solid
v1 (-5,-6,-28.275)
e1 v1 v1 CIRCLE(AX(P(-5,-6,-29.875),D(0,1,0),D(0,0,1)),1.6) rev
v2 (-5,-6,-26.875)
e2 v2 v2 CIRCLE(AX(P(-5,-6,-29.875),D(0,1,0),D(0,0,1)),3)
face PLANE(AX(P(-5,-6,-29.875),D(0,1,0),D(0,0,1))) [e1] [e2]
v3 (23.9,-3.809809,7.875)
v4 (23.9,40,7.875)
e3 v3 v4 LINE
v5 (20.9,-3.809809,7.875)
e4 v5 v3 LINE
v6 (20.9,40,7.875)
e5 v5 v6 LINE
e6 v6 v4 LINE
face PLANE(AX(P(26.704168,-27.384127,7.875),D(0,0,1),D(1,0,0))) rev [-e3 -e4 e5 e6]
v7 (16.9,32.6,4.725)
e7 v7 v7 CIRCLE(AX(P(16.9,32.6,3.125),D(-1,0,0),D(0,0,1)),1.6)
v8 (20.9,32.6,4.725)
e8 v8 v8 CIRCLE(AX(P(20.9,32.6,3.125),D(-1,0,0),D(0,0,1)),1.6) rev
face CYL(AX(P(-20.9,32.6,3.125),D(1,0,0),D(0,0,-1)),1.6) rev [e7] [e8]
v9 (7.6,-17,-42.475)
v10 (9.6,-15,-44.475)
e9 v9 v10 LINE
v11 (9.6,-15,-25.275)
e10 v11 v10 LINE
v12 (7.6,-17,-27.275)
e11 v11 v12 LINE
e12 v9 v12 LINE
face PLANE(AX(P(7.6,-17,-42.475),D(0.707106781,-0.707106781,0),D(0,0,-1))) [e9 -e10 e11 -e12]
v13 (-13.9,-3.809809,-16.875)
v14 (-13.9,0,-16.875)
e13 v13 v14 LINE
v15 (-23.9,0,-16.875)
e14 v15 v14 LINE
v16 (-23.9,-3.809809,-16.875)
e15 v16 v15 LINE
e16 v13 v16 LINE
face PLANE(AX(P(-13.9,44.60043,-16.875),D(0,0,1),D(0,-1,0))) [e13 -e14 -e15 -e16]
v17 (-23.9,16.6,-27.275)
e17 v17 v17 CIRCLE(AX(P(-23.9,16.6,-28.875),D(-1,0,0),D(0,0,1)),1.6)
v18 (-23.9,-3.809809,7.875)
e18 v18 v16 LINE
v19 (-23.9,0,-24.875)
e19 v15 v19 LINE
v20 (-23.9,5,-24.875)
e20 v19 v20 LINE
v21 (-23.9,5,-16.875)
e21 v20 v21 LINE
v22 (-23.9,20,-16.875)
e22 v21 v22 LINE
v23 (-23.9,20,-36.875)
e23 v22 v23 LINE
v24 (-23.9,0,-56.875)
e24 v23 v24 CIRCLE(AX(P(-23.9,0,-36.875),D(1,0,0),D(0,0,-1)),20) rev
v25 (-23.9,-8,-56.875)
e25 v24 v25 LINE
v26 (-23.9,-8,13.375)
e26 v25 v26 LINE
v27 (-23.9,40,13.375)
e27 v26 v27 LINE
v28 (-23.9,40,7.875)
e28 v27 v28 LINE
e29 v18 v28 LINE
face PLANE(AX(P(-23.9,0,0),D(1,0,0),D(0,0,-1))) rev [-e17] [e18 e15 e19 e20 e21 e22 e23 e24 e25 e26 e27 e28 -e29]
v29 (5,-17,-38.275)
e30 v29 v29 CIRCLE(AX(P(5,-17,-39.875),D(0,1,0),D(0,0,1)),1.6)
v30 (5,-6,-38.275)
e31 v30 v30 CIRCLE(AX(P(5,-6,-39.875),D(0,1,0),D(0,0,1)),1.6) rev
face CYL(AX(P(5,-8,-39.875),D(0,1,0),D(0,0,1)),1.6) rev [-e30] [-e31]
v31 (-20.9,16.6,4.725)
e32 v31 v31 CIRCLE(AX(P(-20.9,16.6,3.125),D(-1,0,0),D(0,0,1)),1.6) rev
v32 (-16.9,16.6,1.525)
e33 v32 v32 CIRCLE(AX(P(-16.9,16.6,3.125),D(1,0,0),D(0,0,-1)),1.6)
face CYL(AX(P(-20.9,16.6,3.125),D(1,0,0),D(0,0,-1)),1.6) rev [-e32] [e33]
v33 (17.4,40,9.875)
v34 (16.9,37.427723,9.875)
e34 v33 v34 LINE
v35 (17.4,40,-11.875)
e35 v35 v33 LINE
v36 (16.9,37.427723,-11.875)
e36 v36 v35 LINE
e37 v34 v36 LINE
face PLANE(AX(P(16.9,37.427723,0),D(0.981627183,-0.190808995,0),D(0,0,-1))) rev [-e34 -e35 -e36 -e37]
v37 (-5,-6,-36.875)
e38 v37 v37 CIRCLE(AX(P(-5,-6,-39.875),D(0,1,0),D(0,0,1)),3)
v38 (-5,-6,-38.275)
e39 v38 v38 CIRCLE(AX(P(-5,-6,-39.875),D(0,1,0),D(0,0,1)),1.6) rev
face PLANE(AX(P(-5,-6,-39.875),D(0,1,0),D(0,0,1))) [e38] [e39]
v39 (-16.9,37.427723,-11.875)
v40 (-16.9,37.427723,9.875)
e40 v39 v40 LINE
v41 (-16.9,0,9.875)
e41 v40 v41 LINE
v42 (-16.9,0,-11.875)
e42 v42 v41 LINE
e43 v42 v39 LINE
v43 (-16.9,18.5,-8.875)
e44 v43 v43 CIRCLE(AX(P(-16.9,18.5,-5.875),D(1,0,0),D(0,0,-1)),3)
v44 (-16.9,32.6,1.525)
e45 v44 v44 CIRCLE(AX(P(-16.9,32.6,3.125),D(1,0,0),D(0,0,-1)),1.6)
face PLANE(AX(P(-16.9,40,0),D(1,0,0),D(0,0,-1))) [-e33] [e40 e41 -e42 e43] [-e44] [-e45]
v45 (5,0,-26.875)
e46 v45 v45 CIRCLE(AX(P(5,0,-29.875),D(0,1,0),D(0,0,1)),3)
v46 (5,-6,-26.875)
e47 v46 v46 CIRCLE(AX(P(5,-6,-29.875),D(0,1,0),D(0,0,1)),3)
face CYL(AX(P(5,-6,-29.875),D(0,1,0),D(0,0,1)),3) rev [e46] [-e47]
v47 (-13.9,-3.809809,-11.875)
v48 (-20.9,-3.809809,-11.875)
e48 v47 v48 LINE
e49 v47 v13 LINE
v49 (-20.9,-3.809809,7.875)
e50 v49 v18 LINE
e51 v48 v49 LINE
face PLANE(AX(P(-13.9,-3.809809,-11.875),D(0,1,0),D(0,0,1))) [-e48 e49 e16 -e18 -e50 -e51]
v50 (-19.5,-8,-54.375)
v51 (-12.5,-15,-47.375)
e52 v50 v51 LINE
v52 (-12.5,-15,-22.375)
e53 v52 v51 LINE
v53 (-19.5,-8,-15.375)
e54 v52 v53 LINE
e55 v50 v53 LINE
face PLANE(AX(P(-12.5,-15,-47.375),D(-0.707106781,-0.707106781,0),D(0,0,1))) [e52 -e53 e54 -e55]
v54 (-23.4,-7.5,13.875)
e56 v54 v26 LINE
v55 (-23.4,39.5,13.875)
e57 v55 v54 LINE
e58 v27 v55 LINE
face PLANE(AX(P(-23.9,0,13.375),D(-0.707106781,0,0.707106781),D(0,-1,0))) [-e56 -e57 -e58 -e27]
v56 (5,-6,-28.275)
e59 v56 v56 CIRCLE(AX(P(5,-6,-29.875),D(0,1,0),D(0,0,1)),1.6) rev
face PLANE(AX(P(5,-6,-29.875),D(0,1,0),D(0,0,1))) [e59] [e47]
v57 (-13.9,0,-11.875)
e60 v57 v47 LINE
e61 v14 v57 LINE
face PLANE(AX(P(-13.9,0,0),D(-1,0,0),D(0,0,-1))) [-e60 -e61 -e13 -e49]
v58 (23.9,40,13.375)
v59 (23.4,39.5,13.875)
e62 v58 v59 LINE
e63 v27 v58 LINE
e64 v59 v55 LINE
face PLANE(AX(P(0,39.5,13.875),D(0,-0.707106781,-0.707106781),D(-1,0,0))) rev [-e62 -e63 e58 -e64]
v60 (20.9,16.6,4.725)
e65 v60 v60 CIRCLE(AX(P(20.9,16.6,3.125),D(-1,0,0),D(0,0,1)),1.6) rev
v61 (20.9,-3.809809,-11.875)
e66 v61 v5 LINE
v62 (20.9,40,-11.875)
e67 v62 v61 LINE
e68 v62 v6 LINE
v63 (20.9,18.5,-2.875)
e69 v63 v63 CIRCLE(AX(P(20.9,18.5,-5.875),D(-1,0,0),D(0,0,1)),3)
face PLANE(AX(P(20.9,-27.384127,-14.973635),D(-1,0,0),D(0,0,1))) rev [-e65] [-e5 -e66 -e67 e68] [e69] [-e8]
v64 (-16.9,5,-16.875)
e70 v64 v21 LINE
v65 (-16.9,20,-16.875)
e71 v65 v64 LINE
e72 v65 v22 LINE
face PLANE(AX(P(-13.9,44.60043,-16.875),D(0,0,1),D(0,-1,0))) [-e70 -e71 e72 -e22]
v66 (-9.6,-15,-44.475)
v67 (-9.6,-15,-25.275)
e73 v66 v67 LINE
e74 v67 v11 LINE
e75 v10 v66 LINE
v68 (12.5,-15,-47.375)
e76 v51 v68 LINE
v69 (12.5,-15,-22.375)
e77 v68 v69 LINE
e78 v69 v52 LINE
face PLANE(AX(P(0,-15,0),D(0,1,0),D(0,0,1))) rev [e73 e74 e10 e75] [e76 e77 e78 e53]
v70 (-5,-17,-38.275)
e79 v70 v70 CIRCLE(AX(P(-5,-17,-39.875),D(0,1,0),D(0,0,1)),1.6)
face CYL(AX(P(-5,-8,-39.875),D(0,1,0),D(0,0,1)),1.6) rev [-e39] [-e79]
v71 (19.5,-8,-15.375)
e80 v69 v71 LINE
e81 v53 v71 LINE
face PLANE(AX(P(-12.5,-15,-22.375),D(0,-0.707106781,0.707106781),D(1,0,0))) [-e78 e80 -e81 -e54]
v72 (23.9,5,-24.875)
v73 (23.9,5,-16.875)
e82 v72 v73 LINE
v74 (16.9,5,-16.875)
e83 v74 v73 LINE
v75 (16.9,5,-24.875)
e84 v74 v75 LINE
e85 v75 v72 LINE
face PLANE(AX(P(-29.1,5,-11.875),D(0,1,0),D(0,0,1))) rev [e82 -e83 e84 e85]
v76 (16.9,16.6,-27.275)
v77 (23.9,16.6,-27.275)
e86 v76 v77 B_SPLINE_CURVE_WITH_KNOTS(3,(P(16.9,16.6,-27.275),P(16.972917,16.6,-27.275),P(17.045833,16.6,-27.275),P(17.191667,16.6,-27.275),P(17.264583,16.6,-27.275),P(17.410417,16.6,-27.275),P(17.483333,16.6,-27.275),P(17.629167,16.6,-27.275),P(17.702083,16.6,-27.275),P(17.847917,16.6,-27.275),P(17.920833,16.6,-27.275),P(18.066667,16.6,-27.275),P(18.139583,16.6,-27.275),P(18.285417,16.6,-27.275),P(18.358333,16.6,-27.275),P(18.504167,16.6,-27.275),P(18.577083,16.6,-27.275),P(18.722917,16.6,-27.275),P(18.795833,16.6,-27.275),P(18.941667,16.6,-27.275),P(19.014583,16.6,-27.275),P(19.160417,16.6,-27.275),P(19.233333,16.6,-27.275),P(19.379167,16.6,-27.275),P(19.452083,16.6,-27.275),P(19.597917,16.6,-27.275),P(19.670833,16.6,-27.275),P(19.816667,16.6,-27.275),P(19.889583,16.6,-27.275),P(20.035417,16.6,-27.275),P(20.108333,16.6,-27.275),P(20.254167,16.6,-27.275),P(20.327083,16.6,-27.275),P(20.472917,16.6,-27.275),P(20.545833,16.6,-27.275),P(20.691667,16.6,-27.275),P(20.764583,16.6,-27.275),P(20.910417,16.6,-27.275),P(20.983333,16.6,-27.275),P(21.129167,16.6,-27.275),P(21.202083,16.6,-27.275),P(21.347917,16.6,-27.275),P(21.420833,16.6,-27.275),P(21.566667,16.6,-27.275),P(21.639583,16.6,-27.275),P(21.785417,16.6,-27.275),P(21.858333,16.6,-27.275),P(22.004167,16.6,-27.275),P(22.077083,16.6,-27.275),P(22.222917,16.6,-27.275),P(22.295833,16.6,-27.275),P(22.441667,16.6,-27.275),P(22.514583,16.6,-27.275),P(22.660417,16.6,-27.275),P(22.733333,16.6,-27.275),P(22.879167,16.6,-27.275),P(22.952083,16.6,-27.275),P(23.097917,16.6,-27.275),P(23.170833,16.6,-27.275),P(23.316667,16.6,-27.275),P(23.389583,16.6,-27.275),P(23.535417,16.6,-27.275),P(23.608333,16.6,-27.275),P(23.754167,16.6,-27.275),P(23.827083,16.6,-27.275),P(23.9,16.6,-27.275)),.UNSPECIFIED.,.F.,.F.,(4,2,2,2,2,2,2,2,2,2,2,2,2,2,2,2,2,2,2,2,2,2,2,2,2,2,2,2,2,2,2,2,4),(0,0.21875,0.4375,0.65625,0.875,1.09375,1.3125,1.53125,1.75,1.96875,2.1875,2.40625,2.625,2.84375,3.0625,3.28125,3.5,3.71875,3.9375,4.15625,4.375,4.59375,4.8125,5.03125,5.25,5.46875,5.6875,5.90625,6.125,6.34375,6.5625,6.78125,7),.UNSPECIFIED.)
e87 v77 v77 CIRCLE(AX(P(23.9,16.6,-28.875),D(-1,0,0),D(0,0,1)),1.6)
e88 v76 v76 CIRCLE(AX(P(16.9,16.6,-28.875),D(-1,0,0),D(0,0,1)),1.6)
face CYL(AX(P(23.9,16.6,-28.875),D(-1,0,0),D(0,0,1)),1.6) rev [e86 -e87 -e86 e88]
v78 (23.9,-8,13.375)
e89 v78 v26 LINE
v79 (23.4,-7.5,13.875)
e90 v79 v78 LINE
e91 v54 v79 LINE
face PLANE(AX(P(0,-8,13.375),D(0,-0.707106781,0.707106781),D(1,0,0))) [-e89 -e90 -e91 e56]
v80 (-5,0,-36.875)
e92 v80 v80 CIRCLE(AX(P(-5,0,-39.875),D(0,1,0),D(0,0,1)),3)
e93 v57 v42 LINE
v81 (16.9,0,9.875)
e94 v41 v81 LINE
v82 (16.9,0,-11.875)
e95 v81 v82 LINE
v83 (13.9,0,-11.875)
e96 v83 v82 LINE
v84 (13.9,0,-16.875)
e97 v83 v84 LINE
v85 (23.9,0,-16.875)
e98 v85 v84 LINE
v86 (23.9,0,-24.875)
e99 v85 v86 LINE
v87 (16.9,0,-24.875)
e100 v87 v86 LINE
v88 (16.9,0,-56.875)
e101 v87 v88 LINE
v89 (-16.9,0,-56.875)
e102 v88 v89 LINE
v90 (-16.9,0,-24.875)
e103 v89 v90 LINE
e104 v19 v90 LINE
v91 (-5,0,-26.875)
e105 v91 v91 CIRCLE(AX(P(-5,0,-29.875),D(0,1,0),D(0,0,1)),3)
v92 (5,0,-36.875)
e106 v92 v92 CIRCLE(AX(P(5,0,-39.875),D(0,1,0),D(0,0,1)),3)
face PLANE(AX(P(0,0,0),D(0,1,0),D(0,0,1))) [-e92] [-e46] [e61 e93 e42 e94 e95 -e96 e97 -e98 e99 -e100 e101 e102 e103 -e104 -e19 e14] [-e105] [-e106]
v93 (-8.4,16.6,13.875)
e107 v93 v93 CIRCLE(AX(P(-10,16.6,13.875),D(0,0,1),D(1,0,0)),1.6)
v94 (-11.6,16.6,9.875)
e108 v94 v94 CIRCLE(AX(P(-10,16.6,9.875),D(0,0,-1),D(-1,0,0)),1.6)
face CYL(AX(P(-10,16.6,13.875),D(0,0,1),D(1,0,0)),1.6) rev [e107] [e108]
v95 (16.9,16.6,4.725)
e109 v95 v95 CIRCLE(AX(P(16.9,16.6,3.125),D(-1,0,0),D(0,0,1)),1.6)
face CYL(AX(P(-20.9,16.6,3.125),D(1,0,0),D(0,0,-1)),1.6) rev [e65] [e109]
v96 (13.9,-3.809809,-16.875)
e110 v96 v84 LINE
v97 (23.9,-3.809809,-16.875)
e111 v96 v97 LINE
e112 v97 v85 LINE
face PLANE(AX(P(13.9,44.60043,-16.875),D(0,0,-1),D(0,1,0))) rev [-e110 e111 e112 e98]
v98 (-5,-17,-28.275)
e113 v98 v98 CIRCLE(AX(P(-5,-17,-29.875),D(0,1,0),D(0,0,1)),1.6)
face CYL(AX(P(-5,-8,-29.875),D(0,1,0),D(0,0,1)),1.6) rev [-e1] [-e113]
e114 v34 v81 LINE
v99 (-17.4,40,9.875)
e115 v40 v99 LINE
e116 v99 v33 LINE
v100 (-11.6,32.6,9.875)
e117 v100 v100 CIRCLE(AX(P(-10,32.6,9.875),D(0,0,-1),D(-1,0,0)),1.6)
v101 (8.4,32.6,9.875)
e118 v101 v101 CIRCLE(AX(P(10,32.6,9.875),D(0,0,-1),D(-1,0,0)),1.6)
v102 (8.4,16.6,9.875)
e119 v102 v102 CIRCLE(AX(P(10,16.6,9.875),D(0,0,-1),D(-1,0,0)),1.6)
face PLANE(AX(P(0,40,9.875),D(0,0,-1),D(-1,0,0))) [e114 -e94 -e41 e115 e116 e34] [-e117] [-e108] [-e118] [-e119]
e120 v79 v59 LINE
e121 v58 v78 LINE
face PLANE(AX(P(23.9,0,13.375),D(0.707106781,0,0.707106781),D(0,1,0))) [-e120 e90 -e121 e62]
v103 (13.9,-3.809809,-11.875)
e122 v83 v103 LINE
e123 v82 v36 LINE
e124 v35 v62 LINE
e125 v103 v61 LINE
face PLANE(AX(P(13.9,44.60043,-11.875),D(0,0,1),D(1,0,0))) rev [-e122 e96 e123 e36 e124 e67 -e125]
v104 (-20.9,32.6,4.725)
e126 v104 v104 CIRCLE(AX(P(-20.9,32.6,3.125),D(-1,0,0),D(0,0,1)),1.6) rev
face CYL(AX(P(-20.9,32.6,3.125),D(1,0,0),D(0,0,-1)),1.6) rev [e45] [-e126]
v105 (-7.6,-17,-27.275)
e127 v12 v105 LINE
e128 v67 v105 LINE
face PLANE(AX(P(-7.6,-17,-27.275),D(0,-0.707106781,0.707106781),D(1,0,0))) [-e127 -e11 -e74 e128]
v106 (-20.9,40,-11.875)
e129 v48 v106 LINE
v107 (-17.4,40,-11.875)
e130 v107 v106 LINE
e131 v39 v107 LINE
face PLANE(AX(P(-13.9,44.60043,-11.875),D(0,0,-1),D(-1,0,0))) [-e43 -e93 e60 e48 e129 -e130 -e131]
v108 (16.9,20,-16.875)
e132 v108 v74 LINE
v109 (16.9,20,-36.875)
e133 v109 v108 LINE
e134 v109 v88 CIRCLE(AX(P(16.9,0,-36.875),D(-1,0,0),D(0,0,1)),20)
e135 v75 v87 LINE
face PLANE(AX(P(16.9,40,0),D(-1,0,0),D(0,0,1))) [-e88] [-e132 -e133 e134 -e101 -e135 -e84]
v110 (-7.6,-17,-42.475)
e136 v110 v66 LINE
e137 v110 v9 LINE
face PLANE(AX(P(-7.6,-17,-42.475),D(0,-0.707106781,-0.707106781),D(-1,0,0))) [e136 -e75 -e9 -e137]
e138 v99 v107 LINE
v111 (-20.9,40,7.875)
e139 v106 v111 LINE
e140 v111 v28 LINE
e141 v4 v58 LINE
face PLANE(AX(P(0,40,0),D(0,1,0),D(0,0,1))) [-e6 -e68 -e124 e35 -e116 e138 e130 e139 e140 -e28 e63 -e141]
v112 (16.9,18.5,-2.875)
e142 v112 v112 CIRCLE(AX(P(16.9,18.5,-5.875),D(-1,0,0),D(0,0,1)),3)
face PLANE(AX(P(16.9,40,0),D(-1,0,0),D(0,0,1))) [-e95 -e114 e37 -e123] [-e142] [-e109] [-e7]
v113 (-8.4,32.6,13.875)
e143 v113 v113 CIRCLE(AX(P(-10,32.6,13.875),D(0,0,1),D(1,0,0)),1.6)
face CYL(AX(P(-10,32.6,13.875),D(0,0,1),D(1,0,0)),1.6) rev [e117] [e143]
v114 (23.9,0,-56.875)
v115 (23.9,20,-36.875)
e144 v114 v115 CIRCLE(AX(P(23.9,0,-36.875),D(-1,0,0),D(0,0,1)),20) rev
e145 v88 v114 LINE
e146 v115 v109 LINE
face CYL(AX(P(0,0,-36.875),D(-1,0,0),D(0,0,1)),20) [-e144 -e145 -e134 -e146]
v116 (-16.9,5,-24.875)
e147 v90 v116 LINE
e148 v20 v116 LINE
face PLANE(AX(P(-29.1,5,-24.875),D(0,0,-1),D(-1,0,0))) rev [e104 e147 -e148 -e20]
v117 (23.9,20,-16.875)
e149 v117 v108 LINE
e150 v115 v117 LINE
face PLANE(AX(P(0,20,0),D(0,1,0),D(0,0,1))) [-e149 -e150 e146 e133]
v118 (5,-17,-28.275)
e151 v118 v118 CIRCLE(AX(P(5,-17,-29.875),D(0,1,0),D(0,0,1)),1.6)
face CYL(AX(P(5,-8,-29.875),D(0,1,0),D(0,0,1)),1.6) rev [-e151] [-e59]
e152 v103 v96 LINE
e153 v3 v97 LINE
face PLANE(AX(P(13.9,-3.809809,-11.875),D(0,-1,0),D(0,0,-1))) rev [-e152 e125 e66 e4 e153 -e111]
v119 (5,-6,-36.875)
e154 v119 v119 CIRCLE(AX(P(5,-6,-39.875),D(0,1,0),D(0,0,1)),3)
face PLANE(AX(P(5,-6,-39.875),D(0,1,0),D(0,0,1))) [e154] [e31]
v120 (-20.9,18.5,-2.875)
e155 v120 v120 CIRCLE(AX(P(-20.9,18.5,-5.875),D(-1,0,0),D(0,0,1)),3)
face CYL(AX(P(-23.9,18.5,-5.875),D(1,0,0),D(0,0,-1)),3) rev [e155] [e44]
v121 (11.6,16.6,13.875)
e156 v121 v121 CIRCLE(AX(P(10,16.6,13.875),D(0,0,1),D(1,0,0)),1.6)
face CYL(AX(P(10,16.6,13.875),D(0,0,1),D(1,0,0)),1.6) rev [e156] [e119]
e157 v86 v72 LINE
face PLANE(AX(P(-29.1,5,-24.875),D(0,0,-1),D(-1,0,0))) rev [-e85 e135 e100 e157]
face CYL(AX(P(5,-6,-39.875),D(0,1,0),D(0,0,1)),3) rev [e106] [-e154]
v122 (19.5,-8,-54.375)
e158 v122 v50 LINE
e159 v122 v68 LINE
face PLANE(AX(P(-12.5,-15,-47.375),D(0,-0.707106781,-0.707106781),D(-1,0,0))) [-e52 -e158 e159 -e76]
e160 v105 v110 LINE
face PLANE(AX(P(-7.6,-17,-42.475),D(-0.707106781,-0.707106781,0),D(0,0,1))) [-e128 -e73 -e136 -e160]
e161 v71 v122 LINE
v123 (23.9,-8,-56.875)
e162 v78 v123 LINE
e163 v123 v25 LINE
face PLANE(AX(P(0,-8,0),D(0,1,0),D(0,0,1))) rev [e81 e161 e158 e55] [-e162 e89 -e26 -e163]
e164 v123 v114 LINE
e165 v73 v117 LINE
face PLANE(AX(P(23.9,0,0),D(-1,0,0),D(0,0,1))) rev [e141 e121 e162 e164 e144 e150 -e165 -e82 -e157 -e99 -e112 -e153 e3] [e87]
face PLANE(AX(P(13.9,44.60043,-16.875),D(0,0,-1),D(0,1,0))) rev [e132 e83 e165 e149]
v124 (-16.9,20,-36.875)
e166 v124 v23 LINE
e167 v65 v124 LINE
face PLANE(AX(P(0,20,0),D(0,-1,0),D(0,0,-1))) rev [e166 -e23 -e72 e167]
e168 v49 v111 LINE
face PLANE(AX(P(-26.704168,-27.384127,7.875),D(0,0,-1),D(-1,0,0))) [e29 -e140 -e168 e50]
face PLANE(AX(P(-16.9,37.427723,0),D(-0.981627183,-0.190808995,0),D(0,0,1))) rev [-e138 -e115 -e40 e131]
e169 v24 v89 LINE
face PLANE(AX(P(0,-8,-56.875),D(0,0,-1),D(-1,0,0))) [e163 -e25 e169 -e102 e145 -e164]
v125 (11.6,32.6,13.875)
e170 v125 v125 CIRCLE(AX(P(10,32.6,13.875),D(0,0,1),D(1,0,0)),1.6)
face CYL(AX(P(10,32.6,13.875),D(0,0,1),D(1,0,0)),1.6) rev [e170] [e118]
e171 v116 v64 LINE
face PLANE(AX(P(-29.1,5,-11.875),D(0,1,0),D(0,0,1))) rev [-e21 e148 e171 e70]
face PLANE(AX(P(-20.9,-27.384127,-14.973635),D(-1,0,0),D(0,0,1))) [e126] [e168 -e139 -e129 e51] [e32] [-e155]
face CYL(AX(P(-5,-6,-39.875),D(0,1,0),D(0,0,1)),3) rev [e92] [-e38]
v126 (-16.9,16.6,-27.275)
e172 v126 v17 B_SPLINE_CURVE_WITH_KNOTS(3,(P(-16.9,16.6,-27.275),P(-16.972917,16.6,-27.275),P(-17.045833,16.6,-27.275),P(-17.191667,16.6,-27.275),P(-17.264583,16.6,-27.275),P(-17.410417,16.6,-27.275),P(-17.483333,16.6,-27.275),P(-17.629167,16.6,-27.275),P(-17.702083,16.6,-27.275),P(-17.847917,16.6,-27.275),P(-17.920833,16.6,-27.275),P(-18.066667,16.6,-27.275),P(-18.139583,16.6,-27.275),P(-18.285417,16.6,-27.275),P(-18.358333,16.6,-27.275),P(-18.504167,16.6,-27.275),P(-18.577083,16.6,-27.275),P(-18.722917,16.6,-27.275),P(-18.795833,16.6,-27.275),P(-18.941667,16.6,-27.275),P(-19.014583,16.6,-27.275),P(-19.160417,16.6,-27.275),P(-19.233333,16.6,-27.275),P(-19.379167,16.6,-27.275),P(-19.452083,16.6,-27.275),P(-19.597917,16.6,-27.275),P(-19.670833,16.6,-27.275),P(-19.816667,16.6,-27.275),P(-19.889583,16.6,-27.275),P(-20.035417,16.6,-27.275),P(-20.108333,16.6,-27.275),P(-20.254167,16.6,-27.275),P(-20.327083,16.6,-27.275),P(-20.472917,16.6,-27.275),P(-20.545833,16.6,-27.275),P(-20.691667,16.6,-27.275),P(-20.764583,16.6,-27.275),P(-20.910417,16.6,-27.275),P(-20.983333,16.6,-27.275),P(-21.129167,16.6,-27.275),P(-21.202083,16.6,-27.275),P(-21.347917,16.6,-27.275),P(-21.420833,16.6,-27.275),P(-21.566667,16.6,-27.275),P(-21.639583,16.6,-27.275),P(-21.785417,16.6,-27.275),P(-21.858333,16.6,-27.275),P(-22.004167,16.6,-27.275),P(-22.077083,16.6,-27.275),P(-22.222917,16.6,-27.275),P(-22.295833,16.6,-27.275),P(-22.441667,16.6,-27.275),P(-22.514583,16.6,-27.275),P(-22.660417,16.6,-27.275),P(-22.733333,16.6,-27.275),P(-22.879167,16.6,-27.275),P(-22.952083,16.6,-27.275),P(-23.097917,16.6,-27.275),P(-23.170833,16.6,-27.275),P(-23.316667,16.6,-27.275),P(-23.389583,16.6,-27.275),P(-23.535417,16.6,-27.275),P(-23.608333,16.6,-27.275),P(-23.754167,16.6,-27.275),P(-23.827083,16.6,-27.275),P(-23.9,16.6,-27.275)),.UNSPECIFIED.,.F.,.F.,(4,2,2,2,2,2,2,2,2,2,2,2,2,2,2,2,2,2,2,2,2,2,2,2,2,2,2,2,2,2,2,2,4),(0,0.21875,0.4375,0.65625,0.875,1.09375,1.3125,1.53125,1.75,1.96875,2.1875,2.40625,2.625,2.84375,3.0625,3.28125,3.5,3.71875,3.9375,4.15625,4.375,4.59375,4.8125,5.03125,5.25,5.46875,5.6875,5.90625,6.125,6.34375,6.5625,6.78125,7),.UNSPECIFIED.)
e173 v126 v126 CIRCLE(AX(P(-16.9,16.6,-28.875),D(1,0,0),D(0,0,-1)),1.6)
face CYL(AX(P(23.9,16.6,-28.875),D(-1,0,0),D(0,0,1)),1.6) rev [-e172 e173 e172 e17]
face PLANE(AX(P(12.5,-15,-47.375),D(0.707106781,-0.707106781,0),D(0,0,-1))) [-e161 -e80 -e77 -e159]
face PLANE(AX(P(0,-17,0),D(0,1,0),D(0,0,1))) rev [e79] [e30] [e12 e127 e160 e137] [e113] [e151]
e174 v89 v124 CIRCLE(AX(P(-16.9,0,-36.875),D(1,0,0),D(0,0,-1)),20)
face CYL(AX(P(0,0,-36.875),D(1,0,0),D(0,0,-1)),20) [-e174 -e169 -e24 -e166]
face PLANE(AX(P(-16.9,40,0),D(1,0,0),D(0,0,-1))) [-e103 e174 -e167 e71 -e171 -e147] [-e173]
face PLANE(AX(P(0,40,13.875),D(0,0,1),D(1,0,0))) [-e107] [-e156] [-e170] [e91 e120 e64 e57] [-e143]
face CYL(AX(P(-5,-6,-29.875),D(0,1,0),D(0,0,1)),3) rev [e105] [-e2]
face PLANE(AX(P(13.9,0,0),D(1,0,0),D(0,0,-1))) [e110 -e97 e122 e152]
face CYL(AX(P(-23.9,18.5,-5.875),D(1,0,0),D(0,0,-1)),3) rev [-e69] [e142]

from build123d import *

# Parameters (mm, degrees)
EXTRUDE_1_DEPTH      = 40
SKETCH_1_3_W         = 33.8
SKETCH_1_3_H         = 23.75
SKETCH_1_3_R         = 1.6
EXTRUDE_2_DEPTH      = 8
SKETCH_4_R           = 1.6
CUT_EXTRUDE_1_DEPTH  = 82.129560735
SKETCH_8_W           = 4
SKETCH_8_H           = 43
EXTRUDE_3_DEPTH      = 20
EXTRUDE_START        = 3
SKETCH_11_R          = 1.6
EXTRUDE_5_DEPTH      = 3
SKETCH_12_R          = 1.6
EXTRUDE_6_DEPTH      = 3
FILLET_4_R           = 20
SKETCH_10_R          = 1.6
CUT_EXTRUDE_4_DEPTH  = 85.377755511
CHAMFER_1_SIZE       = 0.5
CHAMFER_1_SIZE2      = 2.572277008
HOLE_WIZARD_M3_1_D   = 3.2
SKETCH_14_W          = 5
SKETCH_14_H          = 48.410238409
CUT_EXTRUDE_6_DEPTH  = 10
CUT_EXTRUDE_11_REACH = 80.166
SKETCH_22_W          = 5.804167704
SKETCH_22_H          = 22.848634954
CHAMFER_2_SIZE       = 0.5
SKETCH_13_W          = 13
SKETCH_13_H          = 5
CUT_EXTRUDE_5_DEPTH  = 53
SKETCH_17_R          = 3
CUT_EXTRUDE_8_DEPTH  = 85.377755511
SKETCH_19_W          = 25
SKETCH_19_H          = 25
EXTRUDE_7_DEPTH      = 7
SKETCH_20_W          = 15.2
SKETCH_20_H          = 15.2
EXTRUDE_8_DEPTH      = 2
CHAMFER_3_SIZE       = 2
SKETCH_21_R          = 1.6
CUT_EXTRUDE_10_DEPTH = 74.52534002
SKETCH_18_R          = 3
CUT_EXTRUDE_9_DEPTH  = 6
CHAMFER_5_SIZE       = 7


with BuildPart() as part:
    # 草图1 → 凸台-拉伸1 (new body)
    with BuildSketch(Plane(origin=(0, 0, 0), x_dir=(1, 0, 0), z_dir=(0, 1, 0))):
        Polygon((-16.9, -9.875), (-16.9, 13.875), (-20.9, 13.875), (-20.9, -13.875), (20.9, -13.875), (20.9, 13.875), (16.9, 13.875), (16.9, -9.875), align=None)
    extrude(amount=EXTRUDE_1_DEPTH)

    # 草图1<3> → 凸台-拉伸2 (add)
    # profile 1 of 3: a face of its own
    with BuildSketch(Plane(origin=(0, 0, 0), x_dir=(1, 0, 0), z_dir=(0, 1, 0))):
        with Locations((0, 2)):
            Rectangle(SKETCH_1_3_W, SKETCH_1_3_H)
    # profile 2 of 3: a face of its own
    with BuildSketch(Plane(origin=(0, 0, 0), x_dir=(1, 0, 0), z_dir=(0, 1, 0))):
        Polygon((-20.9, 13.875), (-16.9, 13.875), (16.9, 13.875), (20.9, 13.875), (20.9, 56.875), (-20.9, 56.875), align=None)
        with Locations(Location((-5, 29.875, 0), (0, 0, 270))):
            Circle(SKETCH_1_3_R, mode=Mode.SUBTRACT)
        with Locations(Location((-5, 39.875, 0), (0, 0, 270))):
            Circle(SKETCH_1_3_R, mode=Mode.SUBTRACT)
        with Locations(Location((5, 29.875, 0), (0, 0, 270))):
            Circle(SKETCH_1_3_R, mode=Mode.SUBTRACT)
        with Locations(Location((5, 39.875, 0), (0, 0, 270))):
            Circle(SKETCH_1_3_R, mode=Mode.SUBTRACT)
    # profile 3 of 3: a face of its own
    with BuildSketch(Plane(origin=(0, 0, 0), x_dir=(1, 0, 0), z_dir=(0, 1, 0))):
        Polygon((-16.9, -9.875), (-16.9, 13.875), (-20.9, 13.875), (-20.9, -13.875), (20.9, -13.875), (20.9, 13.875), (16.9, 13.875), (16.9, -9.875), align=None)
    extrude(amount=-EXTRUDE_2_DEPTH)

    # 草图4 → 切除-拉伸1 (cut, through all)
    with BuildSketch(Plane(origin=(20.9, 0, 0), x_dir=(0, 0, -1), z_dir=(1, 0, 0))):
        with Locations((-3.125, 16.6)):
            Circle(SKETCH_4_R)
        with Locations((-3.125, 32.6)):
            Circle(SKETCH_4_R)
    extrude(amount=-CUT_EXTRUDE_1_DEPTH, mode=Mode.SUBTRACT)

    # 草图8 → 凸台-拉伸3 (add)
    with BuildSketch(Plane(origin=(0, 0, 0), x_dir=(1, 0, 0), z_dir=(0, 1, 0))):
        with Locations((18.9, 35.375)):
            Rectangle(SKETCH_8_W, SKETCH_8_H)
        with Locations((-18.9, 35.375)):
            Rectangle(SKETCH_8_W, SKETCH_8_H)
    extrude(amount=EXTRUDE_3_DEPTH)

    # 草图11 → 凸台-拉伸5 (add)
    with BuildSketch(Plane(origin=(20.9, 0, 0), x_dir=(0, 0, -1), z_dir=(1, 0, 0)).offset(EXTRUDE_START)):
        Polygon((-13.875, 40), (13.875, 40), (13.875, 20), (56.875, 20), (56.875, -8), (-13.875, -8), align=None)
        with Locations((-3.125, 32.6)):
            Circle(SKETCH_11_R, mode=Mode.SUBTRACT)
        with Locations((-3.125, 16.6)):
            Circle(SKETCH_11_R, mode=Mode.SUBTRACT)
    extrude(amount=-EXTRUDE_5_DEPTH)

    # 草图12 → 凸台-拉伸6 (add)
    with BuildSketch(Plane.ZY.offset(20.9)):
        Polygon((-13.875, 40), (13.875, 40), (13.875, -8), (-56.875, -8), (-56.875, 20), (-13.875, 20), align=None)
        with Locations(Location((3.125, 32.6, 0), (0, 0, 180))):
            Circle(SKETCH_12_R, mode=Mode.SUBTRACT)
        with Locations(Location((3.125, 16.6, 0), (0, 0, 180))):
            Circle(SKETCH_12_R, mode=Mode.SUBTRACT)
    extrude(amount=EXTRUDE_6_DEPTH)

    # 圆角4
    fillet_4_edges = [part.edges().sort_by_distance(p)[0] for p in [
        (20.4, 20, -56.875),
        (-20.4, 20, -56.875),
    ]]
    fillet(fillet_4_edges, radius=FILLET_4_R)

    # 草图10 → 切除-拉伸4 (cut, through all)
    with BuildSketch(Plane.ZY.offset(23.9)):
        with Locations((-28.875, 16.6)):
            Circle(SKETCH_10_R)
    extrude(amount=-CUT_EXTRUDE_4_DEPTH, mode=Mode.SUBTRACT)

    # 倒角1
    chamfer_1_edges = [part.edges().sort_by_distance(p)[0] for p in [
        (-16.9, 40, -2),
        (16.9, 40, -2),
    ]]
    chamfer_1_side = [part.faces().sort_by_distance(p)[0] for p in [
        (-17.452711724, 40, -2),
    ]]
    chamfer(chamfer_1_edges, length=CHAMFER_1_SIZE, length2=CHAMFER_1_SIZE2, reference=chamfer_1_side[0])

    # M3 间隙孔1 (through all)
    with Locations(Plane.XY.offset(13.875)):
        with Locations((-10, 32.6), (-10, 16.6), (10, 16.6), (10, 32.6)):
            Hole(HOLE_WIZARD_M3_1_D / 2)

    # 草图14 → 切除-拉伸6 (cut)
    with BuildSketch(Plane(origin=(23.9, 0, 0), x_dir=(0, 0, -1), z_dir=(1, 0, 0))):
        with Locations((14.375, 20.3953107)):
            Rectangle(SKETCH_14_W, SKETCH_14_H)
    cut_extrude_6 = extrude(amount=-CUT_EXTRUDE_6_DEPTH, mode=Mode.SUBTRACT)

    # 切除-拉伸11: up to this face of the body (flat: up to its plane)
    cut_extrude_11_end = Plane(part.part.faces().sort_by_distance((18.9, -3.809808505, -14.375))[0])
    # 草图22 → 切除-拉伸11 (cut, up to the picked face)
    with BuildSketch(Plane(origin=(0, 40, 0), x_dir=(1, 0, 0), z_dir=(0, 1, 0)), mode=Mode.PRIVATE) as cut_extrude_11_sk1:
        with Locations((23.802083852, 3.549317477)):
            Rectangle(SKETCH_22_W, SKETCH_22_H)
    cut_extrude_11_tool1 = split(extrude(cut_extrude_11_sk1.sketch, amount=-CUT_EXTRUDE_11_REACH, mode=Mode.PRIVATE), bisect_by=cut_extrude_11_end, keep=Keep.BOTH, mode=Mode.PRIVATE)
    cut_extrude_11 = cut_extrude_11_tool1.solids().sort_by(Axis((23.802084, 40, -3.549317), (0, -1, 0)))[0]
    add(cut_extrude_11, mode=Mode.SUBTRACT)

    # 镜向1: 切除-拉伸6, 切除-拉伸11 across plane
    add(cut_extrude_6.mirror(Plane(origin=(0, 0, 0), x_dir=(0, 0, 1), z_dir=(1, 0, 0))), mode=Mode.SUBTRACT)
    add(cut_extrude_11.mirror(Plane(origin=(0, 0, 0), x_dir=(0, 0, 1), z_dir=(1, 0, 0))), mode=Mode.SUBTRACT)

    # 倒角2
    chamfer_2_edges = [part.edges().sort_by_distance(p)[0] for p in [
        (-23.9, 16, 13.875),
        (0, -8, 13.875),
        (0, 40, 13.875),
        (23.9, 16, 13.875),
    ]]
    chamfer(chamfer_2_edges, length=CHAMFER_2_SIZE)

    # 草图13 → 切除-拉伸5 (cut)
    with BuildSketch(Plane(origin=(23.9, 0, 0), x_dir=(0, 0, -1), z_dir=(1, 0, 0))):
        with Locations((18.375, 2.5)):
            Rectangle(SKETCH_13_W, SKETCH_13_H)
    extrude(amount=-CUT_EXTRUDE_5_DEPTH, mode=Mode.SUBTRACT)

    # 草图17 → 切除-拉伸8 (cut, through all)
    with BuildSketch(Plane(origin=(23.9, 0, 0), x_dir=(0, 0, -1), z_dir=(1, 0, 0))):
        with Locations((5.875, 18.5)):
            Circle(SKETCH_17_R)
    extrude(amount=-CUT_EXTRUDE_8_DEPTH, mode=Mode.SUBTRACT)

    # 草图19 → 凸台-拉伸7 (add)
    with BuildSketch(Plane.XZ.offset(8)):
        with Locations((0, -34.875)):
            Rectangle(SKETCH_19_W, SKETCH_19_H)
    extrude(amount=EXTRUDE_7_DEPTH)

    # 草图20 → 凸台-拉伸8 (add)
    with BuildSketch(Plane.XZ.offset(15)):
        with Locations((0, -34.875)):
            Rectangle(SKETCH_20_W, SKETCH_20_H)
    extrude(amount=EXTRUDE_8_DEPTH)

    # 倒角3
    chamfer_3_edges = [part.edges().sort_by_distance(p)[0] for p in [
        (7.6, -15, -34.875),
        (0, -15, -42.475),
        (-7.6, -15, -34.875),
        (0, -15, -27.275),
    ]]
    chamfer(chamfer_3_edges, length=CHAMFER_3_SIZE - 0.0001)  # a hair under: the kernel refuses the full size

    # 草图21 → 切除-拉伸10 (cut, through all)
    with BuildSketch(Plane(origin=(0, 0, 0), x_dir=(1, 0, 0), z_dir=(0, 1, 0))):
        with Locations(Location((-5, 39.875, 0), (0, 0, 270))):
            Circle(SKETCH_21_R)
        with Locations(Location((5, 39.875, 0), (0, 0, 270))):
            Circle(SKETCH_21_R)
        with Locations(Location((5, 29.875, 0), (0, 0, 270))):
            Circle(SKETCH_21_R)
        with Locations(Location((-5, 29.875, 0), (0, 0, 270))):
            Circle(SKETCH_21_R)
    extrude(amount=-CUT_EXTRUDE_10_DEPTH, mode=Mode.SUBTRACT)

    # 草图18 → 切除-拉伸9 (cut)
    with BuildSketch(Plane(origin=(0, 0, 0), x_dir=(1, 0, 0), z_dir=(0, 1, 0))):
        with Locations(Location((-5, 39.875, 0), (0, 0, 270))):
            Circle(SKETCH_18_R)
        with Locations(Location((5, 39.875, 0), (0, 0, 270))):
            Circle(SKETCH_18_R)
        with Locations(Location((5, 29.875, 0), (0, 0, 270))):
            Circle(SKETCH_18_R)
        with Locations(Location((-5, 29.875, 0), (0, 0, 270))):
            Circle(SKETCH_18_R)
    extrude(amount=-CUT_EXTRUDE_9_DEPTH, mode=Mode.SUBTRACT)

    # 倒角5
    chamfer_5_edges = [part.edges().sort_by_distance(p)[0] for p in [
        (-12.5, -8, -34.875),
        (0, -8, -47.375),
        (12.5, -8, -34.875),
        (0, -8, -22.375),
    ]]
    chamfer(chamfer_5_edges, length=CHAMFER_5_SIZE - 0.0001)  # a hair under: the kernel refuses the full size


solid = part.part
